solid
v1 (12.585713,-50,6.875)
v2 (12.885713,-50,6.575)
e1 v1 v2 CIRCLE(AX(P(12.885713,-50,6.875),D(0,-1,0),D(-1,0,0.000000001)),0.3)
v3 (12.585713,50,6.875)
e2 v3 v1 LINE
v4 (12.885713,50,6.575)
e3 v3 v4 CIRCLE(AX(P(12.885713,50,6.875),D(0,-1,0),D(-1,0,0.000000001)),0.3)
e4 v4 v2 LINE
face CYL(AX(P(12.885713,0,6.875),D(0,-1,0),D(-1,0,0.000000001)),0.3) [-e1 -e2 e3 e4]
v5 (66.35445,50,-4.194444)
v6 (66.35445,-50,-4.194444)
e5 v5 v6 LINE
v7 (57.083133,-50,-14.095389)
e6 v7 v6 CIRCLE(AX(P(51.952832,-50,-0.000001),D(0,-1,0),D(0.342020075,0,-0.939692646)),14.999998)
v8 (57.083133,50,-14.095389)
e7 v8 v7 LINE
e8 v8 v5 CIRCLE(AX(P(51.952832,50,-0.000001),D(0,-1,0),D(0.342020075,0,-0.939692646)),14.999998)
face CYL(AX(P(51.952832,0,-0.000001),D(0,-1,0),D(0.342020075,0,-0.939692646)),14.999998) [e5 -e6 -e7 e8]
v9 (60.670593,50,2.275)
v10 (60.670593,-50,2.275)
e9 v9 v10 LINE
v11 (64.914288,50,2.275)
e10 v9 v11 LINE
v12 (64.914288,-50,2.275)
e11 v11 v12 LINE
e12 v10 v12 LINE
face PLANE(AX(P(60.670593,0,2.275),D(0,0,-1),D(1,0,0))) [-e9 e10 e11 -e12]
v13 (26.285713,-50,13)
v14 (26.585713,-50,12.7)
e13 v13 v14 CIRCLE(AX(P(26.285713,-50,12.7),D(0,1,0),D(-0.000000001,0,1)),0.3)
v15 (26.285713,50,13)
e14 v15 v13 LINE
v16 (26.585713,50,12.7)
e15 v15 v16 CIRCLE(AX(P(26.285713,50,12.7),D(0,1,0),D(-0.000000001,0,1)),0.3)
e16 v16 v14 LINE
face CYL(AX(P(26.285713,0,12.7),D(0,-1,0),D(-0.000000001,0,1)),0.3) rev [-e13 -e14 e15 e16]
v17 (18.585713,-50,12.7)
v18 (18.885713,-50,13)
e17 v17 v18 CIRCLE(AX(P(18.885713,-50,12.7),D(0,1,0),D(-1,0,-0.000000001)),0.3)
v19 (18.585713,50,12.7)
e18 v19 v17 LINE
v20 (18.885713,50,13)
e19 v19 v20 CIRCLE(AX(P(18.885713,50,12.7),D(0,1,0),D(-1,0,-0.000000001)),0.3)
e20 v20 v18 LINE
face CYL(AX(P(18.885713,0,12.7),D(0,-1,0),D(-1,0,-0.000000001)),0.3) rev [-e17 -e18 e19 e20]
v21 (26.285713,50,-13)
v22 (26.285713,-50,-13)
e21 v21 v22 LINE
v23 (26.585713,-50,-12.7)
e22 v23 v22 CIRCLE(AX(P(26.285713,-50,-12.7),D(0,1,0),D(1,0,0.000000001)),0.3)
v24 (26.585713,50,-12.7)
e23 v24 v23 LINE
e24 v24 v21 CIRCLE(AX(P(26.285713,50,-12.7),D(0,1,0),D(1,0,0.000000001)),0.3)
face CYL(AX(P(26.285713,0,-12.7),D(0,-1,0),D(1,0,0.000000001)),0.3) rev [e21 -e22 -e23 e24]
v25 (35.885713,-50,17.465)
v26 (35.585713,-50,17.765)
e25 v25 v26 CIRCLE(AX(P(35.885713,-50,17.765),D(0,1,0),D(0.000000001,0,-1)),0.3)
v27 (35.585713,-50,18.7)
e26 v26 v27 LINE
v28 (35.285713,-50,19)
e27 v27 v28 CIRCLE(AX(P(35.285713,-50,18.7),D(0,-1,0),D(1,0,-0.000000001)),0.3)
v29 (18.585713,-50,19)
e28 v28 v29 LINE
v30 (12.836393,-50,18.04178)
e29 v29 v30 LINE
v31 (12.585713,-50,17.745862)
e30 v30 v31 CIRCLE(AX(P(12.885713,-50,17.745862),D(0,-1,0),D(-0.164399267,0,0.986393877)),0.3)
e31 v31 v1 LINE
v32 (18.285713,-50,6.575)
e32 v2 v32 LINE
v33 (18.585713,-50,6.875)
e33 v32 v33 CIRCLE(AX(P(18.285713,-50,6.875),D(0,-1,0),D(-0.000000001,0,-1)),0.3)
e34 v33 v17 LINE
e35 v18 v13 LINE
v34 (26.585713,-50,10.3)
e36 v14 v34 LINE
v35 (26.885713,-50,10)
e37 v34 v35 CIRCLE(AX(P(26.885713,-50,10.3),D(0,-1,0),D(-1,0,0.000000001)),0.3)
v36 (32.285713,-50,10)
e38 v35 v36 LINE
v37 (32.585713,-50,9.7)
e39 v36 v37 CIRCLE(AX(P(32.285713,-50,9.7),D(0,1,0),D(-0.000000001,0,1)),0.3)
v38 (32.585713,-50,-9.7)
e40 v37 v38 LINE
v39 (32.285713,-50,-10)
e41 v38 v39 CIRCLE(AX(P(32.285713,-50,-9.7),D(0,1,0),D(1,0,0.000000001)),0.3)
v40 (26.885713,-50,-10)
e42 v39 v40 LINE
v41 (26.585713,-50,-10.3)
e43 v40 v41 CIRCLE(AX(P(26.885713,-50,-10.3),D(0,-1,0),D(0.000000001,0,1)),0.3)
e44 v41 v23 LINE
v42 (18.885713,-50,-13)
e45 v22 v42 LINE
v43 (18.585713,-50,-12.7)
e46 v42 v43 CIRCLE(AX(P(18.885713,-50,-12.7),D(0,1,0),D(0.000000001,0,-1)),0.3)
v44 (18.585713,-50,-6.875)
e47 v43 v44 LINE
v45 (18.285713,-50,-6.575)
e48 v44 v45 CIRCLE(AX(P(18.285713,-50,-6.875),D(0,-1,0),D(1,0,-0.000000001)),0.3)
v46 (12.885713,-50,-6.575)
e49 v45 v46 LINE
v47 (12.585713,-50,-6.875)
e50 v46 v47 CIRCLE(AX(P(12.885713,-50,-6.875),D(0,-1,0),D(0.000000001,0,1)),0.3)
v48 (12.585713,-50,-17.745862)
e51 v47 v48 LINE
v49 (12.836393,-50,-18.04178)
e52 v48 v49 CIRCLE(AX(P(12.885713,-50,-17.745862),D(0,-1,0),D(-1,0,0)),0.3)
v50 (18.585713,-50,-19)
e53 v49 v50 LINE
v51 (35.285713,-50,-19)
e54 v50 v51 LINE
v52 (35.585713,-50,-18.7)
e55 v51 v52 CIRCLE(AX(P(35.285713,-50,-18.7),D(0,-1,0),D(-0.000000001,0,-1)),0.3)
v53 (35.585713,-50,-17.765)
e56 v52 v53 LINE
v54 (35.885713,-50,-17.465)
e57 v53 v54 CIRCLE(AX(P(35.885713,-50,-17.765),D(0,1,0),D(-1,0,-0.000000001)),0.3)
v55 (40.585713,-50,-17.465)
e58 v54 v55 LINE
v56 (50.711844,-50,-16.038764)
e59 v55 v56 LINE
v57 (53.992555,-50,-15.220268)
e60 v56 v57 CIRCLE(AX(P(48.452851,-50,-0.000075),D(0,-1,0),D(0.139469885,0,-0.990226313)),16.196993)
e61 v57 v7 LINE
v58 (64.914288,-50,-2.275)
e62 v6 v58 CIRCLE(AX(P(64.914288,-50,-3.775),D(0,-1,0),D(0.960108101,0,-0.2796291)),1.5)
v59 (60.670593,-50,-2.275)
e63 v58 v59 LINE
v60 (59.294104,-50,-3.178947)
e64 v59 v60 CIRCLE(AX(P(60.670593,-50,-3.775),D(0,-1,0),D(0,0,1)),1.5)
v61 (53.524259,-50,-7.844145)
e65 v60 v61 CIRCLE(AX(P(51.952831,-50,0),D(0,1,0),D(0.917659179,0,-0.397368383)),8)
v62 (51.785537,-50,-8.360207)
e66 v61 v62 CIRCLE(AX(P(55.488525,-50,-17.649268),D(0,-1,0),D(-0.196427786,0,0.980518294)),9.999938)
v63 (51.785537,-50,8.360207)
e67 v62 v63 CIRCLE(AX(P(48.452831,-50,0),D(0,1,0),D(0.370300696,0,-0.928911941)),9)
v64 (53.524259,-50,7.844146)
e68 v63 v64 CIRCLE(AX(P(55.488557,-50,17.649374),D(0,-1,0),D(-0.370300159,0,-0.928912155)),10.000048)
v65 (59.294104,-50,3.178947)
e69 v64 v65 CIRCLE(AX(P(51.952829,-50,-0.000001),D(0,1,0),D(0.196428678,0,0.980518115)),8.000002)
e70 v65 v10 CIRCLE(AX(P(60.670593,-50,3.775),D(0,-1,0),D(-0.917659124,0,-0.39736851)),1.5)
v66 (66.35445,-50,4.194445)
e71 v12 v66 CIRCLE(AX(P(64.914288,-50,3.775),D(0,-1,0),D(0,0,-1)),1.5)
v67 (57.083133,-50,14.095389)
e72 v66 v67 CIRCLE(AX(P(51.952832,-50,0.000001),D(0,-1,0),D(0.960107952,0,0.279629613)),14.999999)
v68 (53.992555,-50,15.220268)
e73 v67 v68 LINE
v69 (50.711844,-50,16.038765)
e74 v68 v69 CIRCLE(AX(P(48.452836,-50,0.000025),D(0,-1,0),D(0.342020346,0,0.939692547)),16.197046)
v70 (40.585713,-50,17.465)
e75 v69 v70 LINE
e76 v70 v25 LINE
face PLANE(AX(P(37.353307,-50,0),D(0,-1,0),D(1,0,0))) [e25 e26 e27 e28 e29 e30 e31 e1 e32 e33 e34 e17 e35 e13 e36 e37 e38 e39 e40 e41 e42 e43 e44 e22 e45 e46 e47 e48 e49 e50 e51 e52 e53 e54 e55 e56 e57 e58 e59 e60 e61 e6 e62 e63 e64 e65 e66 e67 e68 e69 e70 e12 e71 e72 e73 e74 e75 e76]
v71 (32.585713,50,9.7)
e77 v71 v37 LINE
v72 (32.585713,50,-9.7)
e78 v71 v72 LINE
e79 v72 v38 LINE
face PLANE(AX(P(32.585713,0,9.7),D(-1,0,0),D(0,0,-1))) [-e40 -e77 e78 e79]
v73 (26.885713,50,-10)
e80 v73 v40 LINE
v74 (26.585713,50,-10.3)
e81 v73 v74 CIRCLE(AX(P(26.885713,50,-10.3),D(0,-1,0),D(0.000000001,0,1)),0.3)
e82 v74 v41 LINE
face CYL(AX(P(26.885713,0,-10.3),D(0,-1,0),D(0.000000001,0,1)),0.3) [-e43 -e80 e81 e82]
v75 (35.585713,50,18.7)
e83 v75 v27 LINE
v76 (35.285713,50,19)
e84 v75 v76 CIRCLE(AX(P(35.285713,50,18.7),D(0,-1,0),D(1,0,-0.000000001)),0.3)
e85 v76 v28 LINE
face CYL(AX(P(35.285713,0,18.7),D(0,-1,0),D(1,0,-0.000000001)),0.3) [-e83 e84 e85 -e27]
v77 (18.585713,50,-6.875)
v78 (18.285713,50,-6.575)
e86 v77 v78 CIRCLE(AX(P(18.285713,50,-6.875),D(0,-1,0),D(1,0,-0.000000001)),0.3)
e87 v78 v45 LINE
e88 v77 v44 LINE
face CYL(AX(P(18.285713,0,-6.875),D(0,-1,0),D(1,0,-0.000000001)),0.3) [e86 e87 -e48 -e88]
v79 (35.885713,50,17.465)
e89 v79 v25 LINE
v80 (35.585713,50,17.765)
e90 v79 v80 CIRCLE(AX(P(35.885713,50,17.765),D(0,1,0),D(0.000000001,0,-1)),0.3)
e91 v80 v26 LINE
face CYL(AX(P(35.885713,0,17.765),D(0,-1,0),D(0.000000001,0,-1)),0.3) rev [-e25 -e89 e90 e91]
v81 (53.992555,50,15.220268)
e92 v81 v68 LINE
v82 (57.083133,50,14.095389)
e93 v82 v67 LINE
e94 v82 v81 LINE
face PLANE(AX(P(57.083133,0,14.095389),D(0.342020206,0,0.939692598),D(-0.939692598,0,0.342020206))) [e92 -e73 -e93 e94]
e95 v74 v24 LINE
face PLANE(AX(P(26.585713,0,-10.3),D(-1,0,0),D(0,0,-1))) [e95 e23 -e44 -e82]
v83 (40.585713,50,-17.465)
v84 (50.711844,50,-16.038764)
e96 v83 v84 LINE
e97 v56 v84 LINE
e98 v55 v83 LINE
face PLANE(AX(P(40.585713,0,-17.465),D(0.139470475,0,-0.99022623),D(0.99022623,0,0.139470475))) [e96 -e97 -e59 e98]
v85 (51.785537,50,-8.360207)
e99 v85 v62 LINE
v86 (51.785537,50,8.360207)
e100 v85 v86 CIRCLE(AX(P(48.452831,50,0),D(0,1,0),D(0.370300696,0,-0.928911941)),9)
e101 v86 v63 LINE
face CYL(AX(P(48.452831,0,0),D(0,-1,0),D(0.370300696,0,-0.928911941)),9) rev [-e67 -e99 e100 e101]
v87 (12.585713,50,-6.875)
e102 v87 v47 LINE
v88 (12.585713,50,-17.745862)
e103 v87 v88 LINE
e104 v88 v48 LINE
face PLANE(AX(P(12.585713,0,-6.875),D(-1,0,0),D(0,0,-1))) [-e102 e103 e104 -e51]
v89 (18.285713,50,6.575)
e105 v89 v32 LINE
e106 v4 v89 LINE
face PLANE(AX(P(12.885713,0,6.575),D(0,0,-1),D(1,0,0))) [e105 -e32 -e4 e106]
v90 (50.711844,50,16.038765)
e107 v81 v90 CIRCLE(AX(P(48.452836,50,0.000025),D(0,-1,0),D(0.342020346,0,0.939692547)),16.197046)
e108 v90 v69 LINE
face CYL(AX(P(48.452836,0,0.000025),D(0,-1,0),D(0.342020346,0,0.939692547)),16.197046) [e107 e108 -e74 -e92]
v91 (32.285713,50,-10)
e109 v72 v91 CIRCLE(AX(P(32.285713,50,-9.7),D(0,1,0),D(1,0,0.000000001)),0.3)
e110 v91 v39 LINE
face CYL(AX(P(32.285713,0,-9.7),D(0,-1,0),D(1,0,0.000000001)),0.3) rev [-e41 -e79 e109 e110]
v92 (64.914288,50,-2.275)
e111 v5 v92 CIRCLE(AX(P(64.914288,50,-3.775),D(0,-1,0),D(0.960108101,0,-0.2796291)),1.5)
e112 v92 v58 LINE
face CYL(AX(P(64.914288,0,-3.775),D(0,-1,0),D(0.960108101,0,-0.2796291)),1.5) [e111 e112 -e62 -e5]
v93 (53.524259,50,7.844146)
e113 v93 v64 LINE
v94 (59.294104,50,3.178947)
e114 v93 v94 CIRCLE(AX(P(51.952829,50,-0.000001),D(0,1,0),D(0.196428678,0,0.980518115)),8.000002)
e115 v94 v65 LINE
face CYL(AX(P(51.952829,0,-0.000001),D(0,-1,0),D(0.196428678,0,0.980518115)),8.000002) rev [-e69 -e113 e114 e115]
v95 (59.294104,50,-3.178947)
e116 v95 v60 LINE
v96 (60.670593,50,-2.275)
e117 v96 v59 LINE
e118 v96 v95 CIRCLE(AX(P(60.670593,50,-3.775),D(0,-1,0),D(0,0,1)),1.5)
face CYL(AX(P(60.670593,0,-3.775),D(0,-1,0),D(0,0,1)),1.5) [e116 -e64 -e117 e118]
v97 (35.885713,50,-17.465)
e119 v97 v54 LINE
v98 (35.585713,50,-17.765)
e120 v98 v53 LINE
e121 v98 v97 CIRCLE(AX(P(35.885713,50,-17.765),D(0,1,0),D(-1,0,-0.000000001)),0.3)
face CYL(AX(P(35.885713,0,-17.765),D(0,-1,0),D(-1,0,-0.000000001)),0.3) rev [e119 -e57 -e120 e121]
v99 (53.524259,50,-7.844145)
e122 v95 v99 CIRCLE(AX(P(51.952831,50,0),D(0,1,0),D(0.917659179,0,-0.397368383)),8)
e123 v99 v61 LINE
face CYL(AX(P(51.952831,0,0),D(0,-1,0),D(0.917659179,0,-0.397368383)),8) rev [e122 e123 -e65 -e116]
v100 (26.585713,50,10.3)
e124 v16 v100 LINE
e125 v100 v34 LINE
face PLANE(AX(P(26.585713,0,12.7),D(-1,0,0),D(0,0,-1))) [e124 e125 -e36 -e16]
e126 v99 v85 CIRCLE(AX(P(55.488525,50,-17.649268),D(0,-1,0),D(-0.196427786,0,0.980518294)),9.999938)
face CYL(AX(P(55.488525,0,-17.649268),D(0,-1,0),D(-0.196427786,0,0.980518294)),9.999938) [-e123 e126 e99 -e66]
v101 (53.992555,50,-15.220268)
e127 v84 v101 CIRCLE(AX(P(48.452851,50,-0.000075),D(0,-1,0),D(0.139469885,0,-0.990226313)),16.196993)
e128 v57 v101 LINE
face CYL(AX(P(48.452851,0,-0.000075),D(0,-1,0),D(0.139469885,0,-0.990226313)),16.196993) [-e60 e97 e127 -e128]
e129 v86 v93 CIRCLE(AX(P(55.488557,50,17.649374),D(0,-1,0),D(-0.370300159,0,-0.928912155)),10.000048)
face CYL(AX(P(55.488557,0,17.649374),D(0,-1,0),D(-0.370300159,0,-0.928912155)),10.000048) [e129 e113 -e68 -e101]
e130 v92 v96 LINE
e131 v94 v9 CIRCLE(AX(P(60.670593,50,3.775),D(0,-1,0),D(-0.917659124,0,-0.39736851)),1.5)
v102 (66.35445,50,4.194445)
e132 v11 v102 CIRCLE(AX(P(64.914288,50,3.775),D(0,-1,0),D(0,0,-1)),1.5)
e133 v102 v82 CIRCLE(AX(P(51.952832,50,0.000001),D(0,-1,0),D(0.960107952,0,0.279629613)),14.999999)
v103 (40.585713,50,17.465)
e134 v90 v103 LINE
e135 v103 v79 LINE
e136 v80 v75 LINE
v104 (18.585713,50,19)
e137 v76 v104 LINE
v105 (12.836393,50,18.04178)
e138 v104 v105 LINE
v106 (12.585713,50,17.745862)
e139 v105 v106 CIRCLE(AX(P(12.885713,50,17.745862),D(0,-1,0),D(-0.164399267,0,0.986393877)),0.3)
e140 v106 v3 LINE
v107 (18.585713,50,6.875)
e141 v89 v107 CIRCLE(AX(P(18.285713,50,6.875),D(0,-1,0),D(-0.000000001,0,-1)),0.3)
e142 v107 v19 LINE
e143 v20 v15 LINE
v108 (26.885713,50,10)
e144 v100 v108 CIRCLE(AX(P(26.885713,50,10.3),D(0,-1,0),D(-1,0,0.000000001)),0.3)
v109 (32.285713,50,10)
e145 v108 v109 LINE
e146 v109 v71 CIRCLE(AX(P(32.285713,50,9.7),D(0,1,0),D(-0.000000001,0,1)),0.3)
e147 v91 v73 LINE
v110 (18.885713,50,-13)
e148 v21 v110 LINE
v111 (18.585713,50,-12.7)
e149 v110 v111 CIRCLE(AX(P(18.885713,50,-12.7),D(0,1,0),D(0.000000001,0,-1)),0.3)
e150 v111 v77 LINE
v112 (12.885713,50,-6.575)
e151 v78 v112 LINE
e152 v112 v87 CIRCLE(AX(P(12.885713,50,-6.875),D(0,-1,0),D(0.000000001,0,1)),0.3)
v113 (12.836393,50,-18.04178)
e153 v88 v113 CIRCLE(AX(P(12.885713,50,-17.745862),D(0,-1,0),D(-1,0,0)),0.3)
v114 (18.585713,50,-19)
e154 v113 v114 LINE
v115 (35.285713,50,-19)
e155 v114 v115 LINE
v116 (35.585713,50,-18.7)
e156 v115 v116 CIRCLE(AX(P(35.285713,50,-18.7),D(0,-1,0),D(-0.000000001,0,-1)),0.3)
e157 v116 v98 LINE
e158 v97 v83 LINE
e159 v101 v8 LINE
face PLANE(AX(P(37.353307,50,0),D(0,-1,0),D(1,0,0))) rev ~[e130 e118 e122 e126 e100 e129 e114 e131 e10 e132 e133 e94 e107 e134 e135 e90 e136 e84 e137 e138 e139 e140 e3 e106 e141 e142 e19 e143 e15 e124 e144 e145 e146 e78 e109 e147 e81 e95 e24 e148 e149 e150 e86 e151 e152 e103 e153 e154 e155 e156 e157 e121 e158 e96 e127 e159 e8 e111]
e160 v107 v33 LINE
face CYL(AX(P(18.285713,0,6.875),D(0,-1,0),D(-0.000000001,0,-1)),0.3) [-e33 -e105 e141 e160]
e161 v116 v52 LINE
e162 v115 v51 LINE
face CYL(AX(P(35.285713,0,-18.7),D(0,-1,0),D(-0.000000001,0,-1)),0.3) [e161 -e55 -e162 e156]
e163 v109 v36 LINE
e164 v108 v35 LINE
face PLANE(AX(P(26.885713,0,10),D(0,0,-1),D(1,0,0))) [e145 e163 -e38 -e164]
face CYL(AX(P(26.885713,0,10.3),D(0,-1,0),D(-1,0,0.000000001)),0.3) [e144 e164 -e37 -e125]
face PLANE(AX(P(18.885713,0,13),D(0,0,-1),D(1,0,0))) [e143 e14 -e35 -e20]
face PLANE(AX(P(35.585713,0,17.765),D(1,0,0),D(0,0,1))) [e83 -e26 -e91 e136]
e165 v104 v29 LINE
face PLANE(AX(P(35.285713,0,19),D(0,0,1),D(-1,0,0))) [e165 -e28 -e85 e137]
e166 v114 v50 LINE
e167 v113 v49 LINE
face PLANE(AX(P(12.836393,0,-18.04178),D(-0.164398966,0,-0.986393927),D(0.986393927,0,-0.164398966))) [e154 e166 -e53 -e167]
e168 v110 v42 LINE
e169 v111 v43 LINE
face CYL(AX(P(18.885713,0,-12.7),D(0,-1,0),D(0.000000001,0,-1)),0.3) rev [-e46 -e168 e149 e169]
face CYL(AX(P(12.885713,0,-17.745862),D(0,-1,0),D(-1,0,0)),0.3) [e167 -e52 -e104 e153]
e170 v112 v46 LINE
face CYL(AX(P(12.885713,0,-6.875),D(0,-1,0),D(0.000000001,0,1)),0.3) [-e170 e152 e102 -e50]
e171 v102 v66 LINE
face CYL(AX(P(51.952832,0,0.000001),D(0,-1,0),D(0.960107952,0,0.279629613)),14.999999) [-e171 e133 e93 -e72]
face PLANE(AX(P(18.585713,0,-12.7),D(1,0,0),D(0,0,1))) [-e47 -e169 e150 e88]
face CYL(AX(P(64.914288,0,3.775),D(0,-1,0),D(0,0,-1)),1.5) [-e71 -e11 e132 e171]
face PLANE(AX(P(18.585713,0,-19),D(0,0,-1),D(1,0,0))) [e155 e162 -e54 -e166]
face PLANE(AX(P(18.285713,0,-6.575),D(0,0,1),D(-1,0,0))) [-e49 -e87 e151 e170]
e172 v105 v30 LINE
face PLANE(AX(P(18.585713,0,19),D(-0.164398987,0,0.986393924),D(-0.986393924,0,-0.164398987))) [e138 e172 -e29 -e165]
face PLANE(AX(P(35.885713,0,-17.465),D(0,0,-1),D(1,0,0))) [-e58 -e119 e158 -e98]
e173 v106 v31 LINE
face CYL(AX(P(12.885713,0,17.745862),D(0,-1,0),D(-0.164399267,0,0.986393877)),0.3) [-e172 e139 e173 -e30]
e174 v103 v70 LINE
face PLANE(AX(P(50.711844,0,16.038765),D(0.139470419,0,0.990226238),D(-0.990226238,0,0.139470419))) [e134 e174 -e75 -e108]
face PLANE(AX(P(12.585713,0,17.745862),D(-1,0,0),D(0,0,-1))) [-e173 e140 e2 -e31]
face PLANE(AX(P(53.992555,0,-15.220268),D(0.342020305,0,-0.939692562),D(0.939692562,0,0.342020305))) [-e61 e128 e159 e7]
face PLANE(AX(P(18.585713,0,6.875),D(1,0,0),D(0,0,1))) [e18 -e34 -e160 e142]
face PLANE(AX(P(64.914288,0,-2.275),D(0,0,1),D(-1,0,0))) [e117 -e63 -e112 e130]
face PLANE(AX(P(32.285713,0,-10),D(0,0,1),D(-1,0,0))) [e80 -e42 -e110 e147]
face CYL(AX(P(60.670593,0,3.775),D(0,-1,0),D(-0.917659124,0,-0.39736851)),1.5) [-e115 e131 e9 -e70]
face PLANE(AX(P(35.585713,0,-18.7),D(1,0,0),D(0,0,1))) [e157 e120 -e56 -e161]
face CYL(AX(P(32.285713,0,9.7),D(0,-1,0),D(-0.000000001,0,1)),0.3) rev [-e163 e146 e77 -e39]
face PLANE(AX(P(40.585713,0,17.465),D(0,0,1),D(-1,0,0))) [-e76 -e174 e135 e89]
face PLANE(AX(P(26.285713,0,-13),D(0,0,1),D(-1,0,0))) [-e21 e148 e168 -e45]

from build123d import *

# Parameters (mm, degrees)
F1_DEPTH = 50


# Not quite as in the source:
# - ends of sketch curves that miss each other by under 0.0002 mm in the source are joined


with BuildPart() as f1:
    # F0 (on Front) → F1 (new body, symmetric)
    with BuildSketch(Plane.XZ):
        with BuildLine():
            Line((53.992555, -15.220268), (57.083133, -14.095389))
            ThreePointArc((57.083133, -14.095389), (62.9018568836, -10.252747544), (66.3544503107, -4.1944440905))
            ThreePointArc((66.3544503107, -4.1944440905), (66.1141142416, -2.8747683688), (64.914288, -2.275))
            Line((64.914288, -2.275), (60.670593, -2.275))
            ThreePointArc((60.670593, -2.275), (59.8472095147, -2.5211899521), (59.2941043505, -3.1789471518))
            ThreePointArc((59.2941043505, -3.1789471518), (56.9827494729, -6.2209259886), (53.52425904, -7.8441451998))
            ThreePointArc((53.52425904, -7.8441451998), (52.6431740995, -8.0626756758), (51.7855370008, -8.3602070021))
            ThreePointArc((51.7855370008, -8.3602070021), (39.452831, 0), (51.7855371982, 8.3602074972))
            ThreePointArc((51.7855371982, 8.3602074972), (52.6431743712, 8.0626765952), (53.524259133, 7.844145664))
            ThreePointArc((53.524259133, 7.844145664), (56.9827494729, 6.2209259886), (59.2941043849, 3.1789471667))
            ThreePointArc((59.2941043849, 3.1789471667), (59.8472095147, 2.5211899521), (60.670593, 2.275))
            Line((60.670593, 2.275), (64.914288, 2.275))
            ThreePointArc((64.914288, 2.275), (66.1141145297, 2.8747687527), (66.3544497778, 4.1944449353))
            ThreePointArc((66.3544497778, 4.1944449353), (62.9018565554, 10.2527478944), (57.0831331177, 14.0953893235))
            Line((57.0831331177, 14.0953893235), (53.992555, 15.220268))
            ThreePointArc((53.992555, 15.220268), (52.3736165632, 15.715360306), (50.7118440801, 16.0387645685))
            Line((50.7118440801, 16.0387645685), (40.585713, 17.465))
            Line((40.585713, 17.465), (35.885713, 17.465))
            ThreePointArc((35.885713, 17.465), (35.6735809656, 17.5528679656), (35.585713, 17.765))
            Line((35.585713, 17.765), (35.585713, 18.7))
            ThreePointArc((35.585713, 18.7), (35.4978450344, 18.9121320344), (35.285713, 19))
            Line((35.285713, 19), (18.585713, 19))
            Line((18.585713, 19), (12.836393, 18.04178))
            ThreePointArc((12.836393, 18.04178), (12.656806899, 17.9397743434), (12.585713, 17.745862))
            Line((12.585713, 17.745862), (12.585713, 6.875))
            ThreePointArc((12.585713, 6.875), (12.6735809656, 6.6628679656), (12.885713, 6.575))
            Line((12.885713, 6.575), (18.285713, 6.575))
            ThreePointArc((18.285713, 6.575), (18.4978450344, 6.6628679656), (18.585713, 6.875))
            Line((18.585713, 6.875), (18.585713, 12.7))
            ThreePointArc((18.585713, 12.7), (18.6735809656, 12.9121320344), (18.885713, 13))
            Line((18.885713, 13), (26.285713, 13))
            ThreePointArc((26.285713, 13), (26.4978450344, 12.9121320344), (26.585713, 12.7))
            Line((26.585713, 12.7), (26.585713, 10.3))
            ThreePointArc((26.585713, 10.3), (26.6735809656, 10.0878679656), (26.885713, 10))
            Line((26.885713, 10), (32.285713, 10))
            ThreePointArc((32.285713, 10), (32.4978450344, 9.9121320344), (32.585713, 9.7))
            Line((32.585713, 9.7), (32.585713, -9.7))
            ThreePointArc((32.585713, -9.7), (32.4978450344, -9.9121320344), (32.285713, -10))
            Line((32.285713, -10), (26.885713, -10))
            ThreePointArc((26.885713, -10), (26.6735809656, -10.0878679656), (26.585713, -10.3))
            Line((26.585713, -10.3), (26.585713, -12.7))
            ThreePointArc((26.585713, -12.7), (26.4978450344, -12.9121320344), (26.285713, -13))
            Line((26.285713, -13), (18.885713, -13))
            ThreePointArc((18.885713, -13), (18.6735809656, -12.9121320344), (18.585713, -12.7))
            Line((18.585713, -12.7), (18.585713, -6.875))
            ThreePointArc((18.585713, -6.875), (18.4978450344, -6.6628679656), (18.285713, -6.575))
            Line((18.285713, -6.575), (12.885713, -6.575))
            ThreePointArc((12.885713, -6.575), (12.6735809656, -6.6628679656), (12.585713, -6.875))
            Line((12.585713, -6.875), (12.585713, -17.745862))
            ThreePointArc((12.585713, -17.745862), (12.656806899, -17.9397743434), (12.8363929795, -18.0417801231))
            Line((12.8363929795, -18.0417801231), (18.585713, -19))
            Line((18.585713, -19), (35.285713, -19))
            ThreePointArc((35.285713, -19), (35.4978450344, -18.9121320344), (35.585713, -18.7))
            Line((35.585713, -18.7), (35.585713, -17.765))
            ThreePointArc((35.585713, -17.765), (35.6735809656, -17.5528679656), (35.885713, -17.465))
            Line((35.885713, -17.465), (40.585713, -17.465))
            Line((40.585713, -17.465), (50.711844, -16.038764))
            ThreePointArc((50.711844, -16.038764), (52.3736165632, -15.715360306), (53.992555, -15.220268))
        make_face()
    extrude(amount=F1_DEPTH, both=True)


solid = f1.part
